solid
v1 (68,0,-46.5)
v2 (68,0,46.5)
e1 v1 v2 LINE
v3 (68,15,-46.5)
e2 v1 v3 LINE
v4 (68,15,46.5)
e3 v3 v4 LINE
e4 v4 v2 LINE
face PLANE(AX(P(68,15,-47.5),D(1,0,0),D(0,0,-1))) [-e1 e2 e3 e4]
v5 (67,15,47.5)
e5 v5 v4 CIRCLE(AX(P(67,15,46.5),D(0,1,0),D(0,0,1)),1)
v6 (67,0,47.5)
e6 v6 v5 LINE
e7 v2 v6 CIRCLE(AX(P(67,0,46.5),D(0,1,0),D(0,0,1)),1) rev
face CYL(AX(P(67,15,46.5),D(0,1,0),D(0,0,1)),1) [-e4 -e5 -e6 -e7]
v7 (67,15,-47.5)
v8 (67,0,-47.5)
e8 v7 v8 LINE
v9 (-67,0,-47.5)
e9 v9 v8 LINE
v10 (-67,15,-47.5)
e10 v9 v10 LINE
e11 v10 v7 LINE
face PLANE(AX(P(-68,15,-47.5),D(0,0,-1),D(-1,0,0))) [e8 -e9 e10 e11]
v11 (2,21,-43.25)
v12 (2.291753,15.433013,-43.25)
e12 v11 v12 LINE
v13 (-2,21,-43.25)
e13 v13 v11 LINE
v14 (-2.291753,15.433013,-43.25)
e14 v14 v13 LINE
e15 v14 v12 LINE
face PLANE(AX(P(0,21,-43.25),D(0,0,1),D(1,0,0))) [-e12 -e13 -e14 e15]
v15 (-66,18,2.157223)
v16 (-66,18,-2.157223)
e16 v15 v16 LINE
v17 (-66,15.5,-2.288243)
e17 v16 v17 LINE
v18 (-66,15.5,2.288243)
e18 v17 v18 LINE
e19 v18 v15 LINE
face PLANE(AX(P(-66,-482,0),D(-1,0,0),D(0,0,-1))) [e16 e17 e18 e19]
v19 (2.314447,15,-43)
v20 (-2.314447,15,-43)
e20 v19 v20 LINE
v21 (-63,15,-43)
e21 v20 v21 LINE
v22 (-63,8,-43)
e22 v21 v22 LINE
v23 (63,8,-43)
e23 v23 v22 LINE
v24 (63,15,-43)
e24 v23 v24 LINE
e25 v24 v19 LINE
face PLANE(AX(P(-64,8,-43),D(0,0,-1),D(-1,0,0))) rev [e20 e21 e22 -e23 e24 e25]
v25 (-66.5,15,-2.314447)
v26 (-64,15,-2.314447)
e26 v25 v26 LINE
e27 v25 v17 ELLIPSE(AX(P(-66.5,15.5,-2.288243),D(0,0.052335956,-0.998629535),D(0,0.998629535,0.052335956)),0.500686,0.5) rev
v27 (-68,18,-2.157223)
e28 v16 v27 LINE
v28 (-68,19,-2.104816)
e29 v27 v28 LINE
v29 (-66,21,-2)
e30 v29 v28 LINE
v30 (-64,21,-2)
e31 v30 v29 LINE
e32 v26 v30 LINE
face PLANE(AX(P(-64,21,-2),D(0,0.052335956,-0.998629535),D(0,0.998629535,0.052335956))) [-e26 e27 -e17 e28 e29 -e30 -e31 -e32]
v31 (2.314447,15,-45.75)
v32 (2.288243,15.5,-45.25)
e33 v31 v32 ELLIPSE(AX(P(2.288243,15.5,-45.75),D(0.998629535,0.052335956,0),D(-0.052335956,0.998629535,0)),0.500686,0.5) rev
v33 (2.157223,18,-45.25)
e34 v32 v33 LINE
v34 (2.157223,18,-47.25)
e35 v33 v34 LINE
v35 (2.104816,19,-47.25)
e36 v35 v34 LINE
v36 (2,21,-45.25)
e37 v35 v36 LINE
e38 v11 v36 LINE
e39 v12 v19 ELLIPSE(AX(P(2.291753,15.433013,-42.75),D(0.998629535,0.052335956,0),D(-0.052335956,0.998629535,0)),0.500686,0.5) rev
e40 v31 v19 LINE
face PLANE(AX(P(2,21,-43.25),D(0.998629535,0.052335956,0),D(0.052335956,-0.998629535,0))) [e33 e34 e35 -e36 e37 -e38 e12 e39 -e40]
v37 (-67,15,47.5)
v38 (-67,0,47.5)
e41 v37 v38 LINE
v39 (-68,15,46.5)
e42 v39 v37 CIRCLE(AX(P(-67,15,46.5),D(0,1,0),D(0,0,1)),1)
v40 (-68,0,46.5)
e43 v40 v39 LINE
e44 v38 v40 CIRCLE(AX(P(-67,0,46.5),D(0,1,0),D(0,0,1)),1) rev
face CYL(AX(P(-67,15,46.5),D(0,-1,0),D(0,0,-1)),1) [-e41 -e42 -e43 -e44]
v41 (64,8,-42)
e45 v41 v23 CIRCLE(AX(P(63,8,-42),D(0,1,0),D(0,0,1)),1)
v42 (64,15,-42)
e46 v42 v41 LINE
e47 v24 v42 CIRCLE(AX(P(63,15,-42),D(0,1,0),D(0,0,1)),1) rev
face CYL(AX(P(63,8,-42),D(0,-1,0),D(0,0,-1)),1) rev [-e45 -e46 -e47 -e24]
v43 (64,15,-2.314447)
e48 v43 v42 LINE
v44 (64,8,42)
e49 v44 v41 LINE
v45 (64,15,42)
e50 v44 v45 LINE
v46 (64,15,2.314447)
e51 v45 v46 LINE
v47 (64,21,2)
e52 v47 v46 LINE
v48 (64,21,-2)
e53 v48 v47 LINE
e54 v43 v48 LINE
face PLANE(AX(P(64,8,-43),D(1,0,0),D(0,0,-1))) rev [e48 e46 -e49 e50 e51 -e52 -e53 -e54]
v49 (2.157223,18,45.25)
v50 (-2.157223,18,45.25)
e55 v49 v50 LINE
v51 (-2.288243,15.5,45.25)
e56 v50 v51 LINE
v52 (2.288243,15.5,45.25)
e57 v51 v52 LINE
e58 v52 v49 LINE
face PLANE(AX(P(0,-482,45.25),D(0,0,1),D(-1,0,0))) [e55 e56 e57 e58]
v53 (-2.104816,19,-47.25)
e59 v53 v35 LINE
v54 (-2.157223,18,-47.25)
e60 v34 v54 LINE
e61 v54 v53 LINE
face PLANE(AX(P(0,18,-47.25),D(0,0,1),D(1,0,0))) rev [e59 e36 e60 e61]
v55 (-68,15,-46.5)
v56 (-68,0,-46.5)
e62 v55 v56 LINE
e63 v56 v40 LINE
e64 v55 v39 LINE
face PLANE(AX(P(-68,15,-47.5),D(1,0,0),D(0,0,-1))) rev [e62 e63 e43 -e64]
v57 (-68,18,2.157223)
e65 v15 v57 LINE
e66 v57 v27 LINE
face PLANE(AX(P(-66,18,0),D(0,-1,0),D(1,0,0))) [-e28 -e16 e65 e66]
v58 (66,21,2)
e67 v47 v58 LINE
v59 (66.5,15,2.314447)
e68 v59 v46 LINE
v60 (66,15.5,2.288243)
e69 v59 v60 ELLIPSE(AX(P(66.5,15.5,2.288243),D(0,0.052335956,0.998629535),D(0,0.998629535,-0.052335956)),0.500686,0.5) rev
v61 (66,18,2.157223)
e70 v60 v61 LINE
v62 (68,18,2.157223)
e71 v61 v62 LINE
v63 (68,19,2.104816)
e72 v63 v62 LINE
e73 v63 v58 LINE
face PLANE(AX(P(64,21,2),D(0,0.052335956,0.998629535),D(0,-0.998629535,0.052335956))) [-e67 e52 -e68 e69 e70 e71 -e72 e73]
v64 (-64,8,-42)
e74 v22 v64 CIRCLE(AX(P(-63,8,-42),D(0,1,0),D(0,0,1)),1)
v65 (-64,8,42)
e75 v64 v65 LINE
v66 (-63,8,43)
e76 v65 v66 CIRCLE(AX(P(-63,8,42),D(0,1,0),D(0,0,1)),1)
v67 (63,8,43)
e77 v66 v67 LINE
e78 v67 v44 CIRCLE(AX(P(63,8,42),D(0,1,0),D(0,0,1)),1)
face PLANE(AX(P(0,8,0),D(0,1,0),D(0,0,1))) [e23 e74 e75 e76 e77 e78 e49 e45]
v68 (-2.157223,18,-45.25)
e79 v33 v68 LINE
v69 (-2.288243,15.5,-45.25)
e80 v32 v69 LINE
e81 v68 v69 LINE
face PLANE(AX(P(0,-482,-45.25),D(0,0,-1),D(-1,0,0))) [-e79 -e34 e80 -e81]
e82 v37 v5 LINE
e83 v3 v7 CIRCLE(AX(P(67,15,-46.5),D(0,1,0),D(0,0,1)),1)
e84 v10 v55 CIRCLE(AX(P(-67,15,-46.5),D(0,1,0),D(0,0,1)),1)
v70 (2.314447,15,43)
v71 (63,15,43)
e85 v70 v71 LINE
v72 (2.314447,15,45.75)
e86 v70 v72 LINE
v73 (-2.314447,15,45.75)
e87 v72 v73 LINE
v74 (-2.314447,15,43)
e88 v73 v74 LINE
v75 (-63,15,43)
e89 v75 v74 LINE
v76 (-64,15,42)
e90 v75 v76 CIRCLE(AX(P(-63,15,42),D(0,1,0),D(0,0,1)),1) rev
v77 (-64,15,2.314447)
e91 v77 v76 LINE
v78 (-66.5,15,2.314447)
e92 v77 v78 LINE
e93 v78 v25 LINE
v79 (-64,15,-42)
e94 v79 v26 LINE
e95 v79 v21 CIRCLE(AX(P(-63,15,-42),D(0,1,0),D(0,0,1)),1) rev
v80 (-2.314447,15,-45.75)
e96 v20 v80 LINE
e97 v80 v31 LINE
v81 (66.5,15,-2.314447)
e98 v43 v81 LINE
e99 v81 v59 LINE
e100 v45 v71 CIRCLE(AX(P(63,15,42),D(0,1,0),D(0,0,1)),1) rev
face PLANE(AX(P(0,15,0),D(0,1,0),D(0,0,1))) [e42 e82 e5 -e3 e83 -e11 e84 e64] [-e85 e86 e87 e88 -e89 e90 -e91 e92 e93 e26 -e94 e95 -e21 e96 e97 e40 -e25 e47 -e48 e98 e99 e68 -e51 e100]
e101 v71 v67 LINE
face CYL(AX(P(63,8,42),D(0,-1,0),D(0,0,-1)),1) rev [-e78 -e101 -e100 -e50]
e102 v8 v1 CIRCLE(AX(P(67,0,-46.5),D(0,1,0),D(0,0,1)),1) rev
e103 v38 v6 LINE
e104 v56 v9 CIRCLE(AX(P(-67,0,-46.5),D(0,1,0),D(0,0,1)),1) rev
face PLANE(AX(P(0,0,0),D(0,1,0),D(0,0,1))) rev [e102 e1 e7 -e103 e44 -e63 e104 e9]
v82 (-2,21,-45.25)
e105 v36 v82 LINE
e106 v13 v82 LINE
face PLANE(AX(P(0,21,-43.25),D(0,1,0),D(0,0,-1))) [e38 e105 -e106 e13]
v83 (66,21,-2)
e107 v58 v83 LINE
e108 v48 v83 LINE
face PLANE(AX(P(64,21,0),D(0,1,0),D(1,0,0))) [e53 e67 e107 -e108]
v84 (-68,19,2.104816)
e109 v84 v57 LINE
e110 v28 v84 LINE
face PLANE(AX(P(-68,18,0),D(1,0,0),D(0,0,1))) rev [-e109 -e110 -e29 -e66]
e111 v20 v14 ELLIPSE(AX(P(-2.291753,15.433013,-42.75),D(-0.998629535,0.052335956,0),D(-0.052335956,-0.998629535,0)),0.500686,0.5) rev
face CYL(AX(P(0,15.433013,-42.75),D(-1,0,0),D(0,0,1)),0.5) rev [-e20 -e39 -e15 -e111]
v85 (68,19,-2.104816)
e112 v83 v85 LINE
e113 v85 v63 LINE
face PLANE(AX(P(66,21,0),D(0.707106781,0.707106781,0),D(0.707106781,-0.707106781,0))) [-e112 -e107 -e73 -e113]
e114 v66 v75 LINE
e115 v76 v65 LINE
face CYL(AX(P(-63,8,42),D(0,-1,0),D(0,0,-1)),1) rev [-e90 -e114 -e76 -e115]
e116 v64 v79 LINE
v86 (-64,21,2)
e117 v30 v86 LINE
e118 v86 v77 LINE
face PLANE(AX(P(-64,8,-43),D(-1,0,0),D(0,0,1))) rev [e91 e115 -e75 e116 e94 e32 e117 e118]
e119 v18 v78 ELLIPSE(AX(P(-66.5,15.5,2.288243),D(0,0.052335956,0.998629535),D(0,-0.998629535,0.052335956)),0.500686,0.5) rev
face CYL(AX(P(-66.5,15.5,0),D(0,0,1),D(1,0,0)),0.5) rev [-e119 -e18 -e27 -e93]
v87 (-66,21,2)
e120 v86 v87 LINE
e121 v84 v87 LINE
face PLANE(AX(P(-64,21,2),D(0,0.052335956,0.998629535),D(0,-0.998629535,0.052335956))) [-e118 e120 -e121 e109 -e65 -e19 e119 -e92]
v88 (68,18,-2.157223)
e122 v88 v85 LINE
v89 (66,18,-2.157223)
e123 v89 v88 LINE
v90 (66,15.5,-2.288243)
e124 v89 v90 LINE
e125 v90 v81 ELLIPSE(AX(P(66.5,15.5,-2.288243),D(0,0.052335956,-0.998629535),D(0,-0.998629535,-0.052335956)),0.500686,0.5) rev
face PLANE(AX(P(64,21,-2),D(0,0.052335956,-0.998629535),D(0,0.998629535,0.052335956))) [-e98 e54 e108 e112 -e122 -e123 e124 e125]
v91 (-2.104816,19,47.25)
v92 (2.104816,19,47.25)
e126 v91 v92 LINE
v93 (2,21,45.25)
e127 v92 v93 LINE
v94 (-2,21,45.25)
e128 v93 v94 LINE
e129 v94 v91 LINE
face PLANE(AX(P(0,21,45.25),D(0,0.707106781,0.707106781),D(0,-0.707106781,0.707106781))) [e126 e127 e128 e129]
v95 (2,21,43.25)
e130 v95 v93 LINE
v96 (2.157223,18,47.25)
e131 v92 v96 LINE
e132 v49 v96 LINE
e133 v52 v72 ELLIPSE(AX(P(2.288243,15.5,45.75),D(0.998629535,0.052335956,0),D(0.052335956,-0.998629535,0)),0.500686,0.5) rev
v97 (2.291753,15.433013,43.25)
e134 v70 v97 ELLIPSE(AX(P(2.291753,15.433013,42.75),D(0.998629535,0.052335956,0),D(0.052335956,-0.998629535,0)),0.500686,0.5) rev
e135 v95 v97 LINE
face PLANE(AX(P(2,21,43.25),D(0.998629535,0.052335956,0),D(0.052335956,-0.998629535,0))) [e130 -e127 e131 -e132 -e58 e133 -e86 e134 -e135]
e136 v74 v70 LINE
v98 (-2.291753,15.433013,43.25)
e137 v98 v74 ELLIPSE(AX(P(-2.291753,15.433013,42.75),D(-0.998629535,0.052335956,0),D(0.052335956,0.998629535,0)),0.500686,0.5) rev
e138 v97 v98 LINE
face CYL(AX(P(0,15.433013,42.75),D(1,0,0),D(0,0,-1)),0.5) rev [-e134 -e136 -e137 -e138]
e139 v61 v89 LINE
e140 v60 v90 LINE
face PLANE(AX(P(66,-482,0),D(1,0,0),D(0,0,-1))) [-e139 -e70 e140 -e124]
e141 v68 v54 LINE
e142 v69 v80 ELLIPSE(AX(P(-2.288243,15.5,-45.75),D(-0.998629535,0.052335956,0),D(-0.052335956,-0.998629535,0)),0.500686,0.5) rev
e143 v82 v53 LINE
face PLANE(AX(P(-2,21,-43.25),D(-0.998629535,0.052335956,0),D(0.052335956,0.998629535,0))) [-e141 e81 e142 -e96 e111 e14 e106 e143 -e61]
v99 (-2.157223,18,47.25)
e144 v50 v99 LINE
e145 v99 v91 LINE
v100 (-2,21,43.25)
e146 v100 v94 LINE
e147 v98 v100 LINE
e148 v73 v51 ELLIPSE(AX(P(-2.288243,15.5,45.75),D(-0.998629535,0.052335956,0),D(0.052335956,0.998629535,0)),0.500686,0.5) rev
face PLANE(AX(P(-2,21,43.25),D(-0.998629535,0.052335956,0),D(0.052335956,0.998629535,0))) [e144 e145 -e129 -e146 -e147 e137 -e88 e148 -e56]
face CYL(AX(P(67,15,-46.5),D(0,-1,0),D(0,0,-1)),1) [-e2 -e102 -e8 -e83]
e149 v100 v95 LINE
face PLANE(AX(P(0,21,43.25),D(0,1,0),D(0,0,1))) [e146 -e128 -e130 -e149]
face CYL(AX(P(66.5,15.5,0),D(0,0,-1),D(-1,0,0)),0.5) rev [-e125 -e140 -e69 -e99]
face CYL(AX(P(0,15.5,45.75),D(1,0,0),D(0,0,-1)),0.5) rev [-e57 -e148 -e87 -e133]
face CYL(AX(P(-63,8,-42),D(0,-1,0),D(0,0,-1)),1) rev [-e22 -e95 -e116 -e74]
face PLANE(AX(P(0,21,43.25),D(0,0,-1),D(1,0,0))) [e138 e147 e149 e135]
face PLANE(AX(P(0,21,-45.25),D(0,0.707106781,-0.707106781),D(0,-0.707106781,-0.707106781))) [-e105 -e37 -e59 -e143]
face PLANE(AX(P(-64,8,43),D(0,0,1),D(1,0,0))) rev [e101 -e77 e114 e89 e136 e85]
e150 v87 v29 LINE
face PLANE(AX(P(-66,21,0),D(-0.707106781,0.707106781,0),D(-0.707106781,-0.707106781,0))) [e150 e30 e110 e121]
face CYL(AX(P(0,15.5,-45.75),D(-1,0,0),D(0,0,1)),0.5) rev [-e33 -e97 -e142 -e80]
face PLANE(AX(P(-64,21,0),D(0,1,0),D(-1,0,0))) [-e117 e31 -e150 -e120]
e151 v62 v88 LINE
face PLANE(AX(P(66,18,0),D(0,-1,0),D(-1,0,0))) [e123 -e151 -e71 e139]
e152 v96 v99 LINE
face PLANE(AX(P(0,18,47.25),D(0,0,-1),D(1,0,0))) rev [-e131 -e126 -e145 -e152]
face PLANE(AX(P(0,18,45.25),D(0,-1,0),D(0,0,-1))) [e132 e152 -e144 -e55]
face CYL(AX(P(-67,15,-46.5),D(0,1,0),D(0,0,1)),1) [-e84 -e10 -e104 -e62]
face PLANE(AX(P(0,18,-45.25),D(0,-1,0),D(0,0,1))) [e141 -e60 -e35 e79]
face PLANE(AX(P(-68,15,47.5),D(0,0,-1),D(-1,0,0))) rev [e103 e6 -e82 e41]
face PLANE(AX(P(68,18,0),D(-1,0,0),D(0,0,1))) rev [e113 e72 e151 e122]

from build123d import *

# Parameters (mm, degrees)
SKETCH1_W            = 136
SKETCH1_H            = 95
BOSS_EXTRUDE1_DEPTH  = 15
SKETCH2_W            = 128
SKETCH2_H            = 86
CUT_EXTRUDE1_DEPTH   = 7
SNAP_START           = 64
SNAP_HOOK2_DEPTH     = 2
SNAP_HOOK2_2_DEPTH   = 2
FILLET1_R            = 1
FILLET2_R            = 0.5
FILLET2_OF_MIRROR1_R = 0.5
SNAP_START_2         = 43.25
SNAP_HOOK3_DEPTH     = 2
FILLET3_R            = 0.5
FILLET3_OF_MIRROR2_R = 0.5


with BuildPart() as part:
    # Sketch1 → Boss-Extrude1 (new body)
    with BuildSketch(Plane(origin=(0, 0, 0), x_dir=(1, 0, 0), z_dir=(0, 1, 0))):
        Rectangle(SKETCH1_W, SKETCH1_H)
    extrude(amount=BOSS_EXTRUDE1_DEPTH)

    # Sketch2 → Cut-Extrude1 (cut)
    with BuildSketch(Plane(origin=(0, 15, 0), x_dir=(1, 0, 0), z_dir=(0, 1, 0))):
        Rectangle(SKETCH2_W, SKETCH2_H)
    extrude(amount=-CUT_EXTRUDE1_DEPTH, mode=Mode.SUBTRACT)



with BuildPart() as body_2:
    # Snap Hook2: read off the stored shape, not the designer's step
    # Snap Hook2 outline → Snap Hook2 (new body)
    with BuildSketch(Plane.YZ.offset(SNAP_START)):
        Polygon((21, -2), (21, 2), (18, 2.157223338), (18, -2.157223338), align=None)
    snap_hook2 = extrude(amount=SNAP_HOOK2_DEPTH)


with BuildPart() as part_1:
    add(part.part)

    add(body_2.part)  # Snap Hook2 2 merges body 2
    # Snap Hook2 2 outline → Snap Hook2 2 (add)
    with BuildSketch(Plane.YZ.offset(SNAP_START)):
        Polygon((18, -2.157223338), (18, 2.157223338), (15, 2.314446676), (15, -2.314446676), align=None)
    snap_hook2_2 = extrude(amount=SNAP_HOOK2_2_DEPTH)

    # Snap Hook2 3: loft between two sections, ruled curve by curve
    snap_hook2_3_from = [
        Edge.make_line((66, 21, -2), (66, 21, 2)),
        Edge.make_line((66, 18, 2.157223338), (66, 18, -2.157223338)),
        Edge.make_line((66, 18, 2.157223338), (66, 21, 2)),
        Edge.make_line((66, 18, -2.157223338), (66, 21, -2)),
    ]
    snap_hook2_3_to = [
        Edge.make_line((68, 19, -2.104815559), (68, 19, 2.104815559)),
        Edge.make_line((68, 18, 2.157223338), (68, 18, -2.157223338)),
        Edge.make_line((68, 18, 2.157223338), (68, 19, 2.104815559)),
        Edge.make_line((68, 18, -2.157223338), (68, 19, -2.104815559)),
    ]
    snap_hook2_3 = Solid(Shell([*[Face.make_surface_from_curves(snap_hook2_3_from[k], snap_hook2_3_to[k]) for k in range(4)], Face(Wire(snap_hook2_3_from)), Face(Wire(snap_hook2_3_to))]))
    add(snap_hook2_3)

    # Fillet1
    fillet1_edges = [part_1.edges().sort_by_distance(p)[0] for p in [
        (-64, 11.5, 43),
        (-64, 11.5, -43),
        (64, 11.5, -43),
        (64, 11.5, 43),
        (68, 7.5, 47.5),
        (68, 7.5, -47.5),
        (-68, 7.5, -47.5),
        (-68, 7.5, 47.5),
    ]]
    fillet(fillet1_edges, radius=FILLET1_R)

    # Fillet2
    fillet2_edges = [part_1.edges().sort_by_distance(p)[0] for p in [
        (66, 15, 0),
    ]]
    fillet(fillet2_edges, radius=FILLET2_R)

    # Mirror1: Snap Hook2, Snap Hook2 2, Snap Hook2 3 across plane
    add(snap_hook2.mirror(Plane(origin=(0, 0, 0), x_dir=(0, 0, 1), z_dir=(1, 0, 0))))
    add(snap_hook2_2.mirror(Plane(origin=(0, 0, 0), x_dir=(0, 0, 1), z_dir=(1, 0, 0))))
    add(snap_hook2_3.mirror(Plane(origin=(0, 0, 0), x_dir=(0, 0, 1), z_dir=(1, 0, 0))))

    # Fillet2 of Mirror1
    fillet2_of_mirror1_edges = [part_1.edges().sort_by_distance(p)[0] for p in [
        (-66, 15, 0),
    ]]
    fillet(fillet2_of_mirror1_edges, radius=FILLET2_OF_MIRROR1_R)

    # Snap Hook3: read off the stored shape, not the designer's step
    # Snap Hook3 outline → Snap Hook3 (add)
    with BuildSketch(Plane.XY.offset(SNAP_START_2)):
        Polygon((2, 21), (-2, 21), (-2.314446676, 15), (2.314446676, 15), align=None)
    snap_hook3 = extrude(amount=SNAP_HOOK3_DEPTH)

    # Snap Hook3 2: loft between two sections, ruled curve by curve
    snap_hook3_2_from = [
        Edge.make_line((-2.157223338, 18, 45.25), (2.157223338, 18, 45.25)),
        Edge.make_line((2, 21, 45.25), (-2, 21, 45.25)),
        Edge.make_line((2, 21, 45.25), (2.157223338, 18, 45.25)),
        Edge.make_line((-2, 21, 45.25), (-2.157223338, 18, 45.25)),
    ]
    snap_hook3_2_to = [
        Edge.make_line((-2.157223338, 18, 47.25), (2.157223338, 18, 47.25)),
        Edge.make_line((2.104815559, 19, 47.25), (-2.104815559, 19, 47.25)),
        Edge.make_line((2.104815559, 19, 47.25), (2.157223338, 18, 47.25)),
        Edge.make_line((-2.104815559, 19, 47.25), (-2.157223338, 18, 47.25)),
    ]
    snap_hook3_2 = Solid(Shell([*[Face.make_surface_from_curves(snap_hook3_2_from[k], snap_hook3_2_to[k]) for k in range(4)], Face(Wire(snap_hook3_2_from)), Face(Wire(snap_hook3_2_to))]))
    add(snap_hook3_2)

    # Fillet3
    # the kernel refuses this fillet: 0.5 mm, written as the material it adds along each edge
    with BuildSketch(Plane(origin=(-3.564446676, 15, 45.25), x_dir=(0, 0, 1), z_dir=(1, 0, 0))) as fillet3_piece_1_section:
        with BuildLine():
            CenterArc((FILLET3_R, -FILLET3_R), FILLET3_R, 90, 90)
            Line((0, -FILLET3_R), (-FILLET3_R * 0.02, -FILLET3_R))
            Line((-FILLET3_R * 0.02, -FILLET3_R), (-FILLET3_R * 0.02, FILLET3_R * 0.02))
            Line((-FILLET3_R * 0.02, FILLET3_R * 0.02), (FILLET3_R, FILLET3_R * 0.02))
            Line((FILLET3_R, FILLET3_R * 0.02), (FILLET3_R, 0))
        make_face()
    fillet3_piece_1 = extrude(amount=7.128893352, mode=Mode.PRIVATE)
    fillet3_piece_1 = split(fillet3_piece_1, bisect_by=Plane(origin=(2.29834408, 15.307255844, 45.25), z_dir=(-0.998629534751949, -0.05233595629302951, 0)), keep=Keep.TOP, mode=Mode.PRIVATE)
    fillet3_piece_1 = split(fillet3_piece_1, bisect_by=Plane(origin=(-2.317870491, 14.93466971, 45.25), z_dir=(0.998629534751949, -0.05233595629302951, 0)), keep=Keep.TOP, mode=Mode.PRIVATE)
    add(fillet3_piece_1)
    with BuildSketch(Plane(origin=(-3.396978431, 15, 43.25), x_dir=(0, 0, -1), z_dir=(1, 0, 0))) as fillet3_piece_2_section:
        with BuildLine():
            CenterArc((0.5, 0.433012702), FILLET3_R, 180, 60)
            Line((0, 0.433012702), (-0.01, 0.433012702))
            Line((-0.01, 0.433012702), (-0.01, 0))
            Line((-0.01, 0), (0, -0.01))
            ThreePointArc((0, -0.01), (0.125, -0.01), (0.245, -0.008660254))
            Line((0.245, -0.008660254), (0.25, 0))
        make_face()
    fillet3_piece_2 = extrude(amount=6.793956861, mode=Mode.PRIVATE)
    fillet3_piece_2 = split(fillet3_piece_2, bisect_by=Plane(origin=(2.298802784, 15.298503245, 43.25), z_dir=(-0.998629534751949, -0.05233595629302951, 0)), keep=Keep.TOP, mode=Mode.PRIVATE)
    fillet3_piece_2 = split(fillet3_piece_2, bisect_by=Plane(origin=(-2.317411787, 14.94342231, 43.25), z_dir=(0.998629534751949, -0.05233595629302951, 0)), keep=Keep.TOP, mode=Mode.PRIVATE)
    add(fillet3_piece_2)

    # Mirror2: Snap Hook3, Snap Hook3 2 across plane
    add(snap_hook3.mirror(Plane.XY))
    add(snap_hook3_2.mirror(Plane.XY))

    # Fillet3 of Mirror2
    # the kernel refuses this fillet: 0.5 mm, written as the material it adds along each edge
    with BuildSketch(Plane(origin=(-3.564446676, 15, -45.25), x_dir=(0, 0, -1), z_dir=(1, 0, 0))) as fillet3_of_mirror2_piece_1_section:
        with BuildLine():
            CenterArc((FILLET3_OF_MIRROR2_R, FILLET3_OF_MIRROR2_R), FILLET3_OF_MIRROR2_R, 180, 90)
            Line((0, FILLET3_OF_MIRROR2_R), (-FILLET3_OF_MIRROR2_R * 0.02, FILLET3_OF_MIRROR2_R))
            Line((-FILLET3_OF_MIRROR2_R * 0.02, FILLET3_OF_MIRROR2_R), (-FILLET3_OF_MIRROR2_R * 0.02, -FILLET3_OF_MIRROR2_R * 0.02))
            Line((-FILLET3_OF_MIRROR2_R * 0.02, -FILLET3_OF_MIRROR2_R * 0.02), (FILLET3_OF_MIRROR2_R, -FILLET3_OF_MIRROR2_R * 0.02))
            Line((FILLET3_OF_MIRROR2_R, -FILLET3_OF_MIRROR2_R * 0.02), (FILLET3_OF_MIRROR2_R, 0))
        make_face()
    fillet3_of_mirror2_piece_1 = extrude(amount=7.128893352, mode=Mode.PRIVATE)
    fillet3_of_mirror2_piece_1 = split(fillet3_of_mirror2_piece_1, bisect_by=Plane(origin=(-2.317870491, 14.93466971, -45.25), z_dir=(0.998629534751949, -0.05233595629302951, 0)), keep=Keep.TOP, mode=Mode.PRIVATE)
    fillet3_of_mirror2_piece_1 = split(fillet3_of_mirror2_piece_1, bisect_by=Plane(origin=(2.29834408, 15.307255844, -45.25), z_dir=(-0.998629534751949, -0.05233595629302951, 0)), keep=Keep.TOP, mode=Mode.PRIVATE)
    add(fillet3_of_mirror2_piece_1)
    with BuildSketch(Plane(origin=(-3.396978431, 15, -43.25), x_dir=(0, 0, 1), z_dir=(1, 0, 0))) as fillet3_of_mirror2_piece_2_section:
        with BuildLine():
            CenterArc((0.5, -0.433012702), FILLET3_OF_MIRROR2_R, 120, 60)
            Line((0, -0.433012702), (-0.01, -0.433012702))
            Line((-0.01, -0.433012702), (-0.01, 0))
            Line((-0.01, 0), (0, 0.01))
            ThreePointArc((0, 0.01), (0.125, 0.01), (0.245, 0.008660254))
            Line((0.245, 0.008660254), (0.25, 0))
        make_face()
    fillet3_of_mirror2_piece_2 = extrude(amount=6.793956861, mode=Mode.PRIVATE)
    fillet3_of_mirror2_piece_2 = split(fillet3_of_mirror2_piece_2, bisect_by=Plane(origin=(-2.317411787, 14.94342231, -43.25), z_dir=(0.998629534751949, -0.05233595629302951, 0)), keep=Keep.TOP, mode=Mode.PRIVATE)
    fillet3_of_mirror2_piece_2 = split(fillet3_of_mirror2_piece_2, bisect_by=Plane(origin=(2.298802784, 15.298503245, -43.25), z_dir=(-0.998629534751949, -0.05233595629302951, 0)), keep=Keep.TOP, mode=Mode.PRIVATE)
    add(fillet3_of_mirror2_piece_2)


solid = part_1.part
